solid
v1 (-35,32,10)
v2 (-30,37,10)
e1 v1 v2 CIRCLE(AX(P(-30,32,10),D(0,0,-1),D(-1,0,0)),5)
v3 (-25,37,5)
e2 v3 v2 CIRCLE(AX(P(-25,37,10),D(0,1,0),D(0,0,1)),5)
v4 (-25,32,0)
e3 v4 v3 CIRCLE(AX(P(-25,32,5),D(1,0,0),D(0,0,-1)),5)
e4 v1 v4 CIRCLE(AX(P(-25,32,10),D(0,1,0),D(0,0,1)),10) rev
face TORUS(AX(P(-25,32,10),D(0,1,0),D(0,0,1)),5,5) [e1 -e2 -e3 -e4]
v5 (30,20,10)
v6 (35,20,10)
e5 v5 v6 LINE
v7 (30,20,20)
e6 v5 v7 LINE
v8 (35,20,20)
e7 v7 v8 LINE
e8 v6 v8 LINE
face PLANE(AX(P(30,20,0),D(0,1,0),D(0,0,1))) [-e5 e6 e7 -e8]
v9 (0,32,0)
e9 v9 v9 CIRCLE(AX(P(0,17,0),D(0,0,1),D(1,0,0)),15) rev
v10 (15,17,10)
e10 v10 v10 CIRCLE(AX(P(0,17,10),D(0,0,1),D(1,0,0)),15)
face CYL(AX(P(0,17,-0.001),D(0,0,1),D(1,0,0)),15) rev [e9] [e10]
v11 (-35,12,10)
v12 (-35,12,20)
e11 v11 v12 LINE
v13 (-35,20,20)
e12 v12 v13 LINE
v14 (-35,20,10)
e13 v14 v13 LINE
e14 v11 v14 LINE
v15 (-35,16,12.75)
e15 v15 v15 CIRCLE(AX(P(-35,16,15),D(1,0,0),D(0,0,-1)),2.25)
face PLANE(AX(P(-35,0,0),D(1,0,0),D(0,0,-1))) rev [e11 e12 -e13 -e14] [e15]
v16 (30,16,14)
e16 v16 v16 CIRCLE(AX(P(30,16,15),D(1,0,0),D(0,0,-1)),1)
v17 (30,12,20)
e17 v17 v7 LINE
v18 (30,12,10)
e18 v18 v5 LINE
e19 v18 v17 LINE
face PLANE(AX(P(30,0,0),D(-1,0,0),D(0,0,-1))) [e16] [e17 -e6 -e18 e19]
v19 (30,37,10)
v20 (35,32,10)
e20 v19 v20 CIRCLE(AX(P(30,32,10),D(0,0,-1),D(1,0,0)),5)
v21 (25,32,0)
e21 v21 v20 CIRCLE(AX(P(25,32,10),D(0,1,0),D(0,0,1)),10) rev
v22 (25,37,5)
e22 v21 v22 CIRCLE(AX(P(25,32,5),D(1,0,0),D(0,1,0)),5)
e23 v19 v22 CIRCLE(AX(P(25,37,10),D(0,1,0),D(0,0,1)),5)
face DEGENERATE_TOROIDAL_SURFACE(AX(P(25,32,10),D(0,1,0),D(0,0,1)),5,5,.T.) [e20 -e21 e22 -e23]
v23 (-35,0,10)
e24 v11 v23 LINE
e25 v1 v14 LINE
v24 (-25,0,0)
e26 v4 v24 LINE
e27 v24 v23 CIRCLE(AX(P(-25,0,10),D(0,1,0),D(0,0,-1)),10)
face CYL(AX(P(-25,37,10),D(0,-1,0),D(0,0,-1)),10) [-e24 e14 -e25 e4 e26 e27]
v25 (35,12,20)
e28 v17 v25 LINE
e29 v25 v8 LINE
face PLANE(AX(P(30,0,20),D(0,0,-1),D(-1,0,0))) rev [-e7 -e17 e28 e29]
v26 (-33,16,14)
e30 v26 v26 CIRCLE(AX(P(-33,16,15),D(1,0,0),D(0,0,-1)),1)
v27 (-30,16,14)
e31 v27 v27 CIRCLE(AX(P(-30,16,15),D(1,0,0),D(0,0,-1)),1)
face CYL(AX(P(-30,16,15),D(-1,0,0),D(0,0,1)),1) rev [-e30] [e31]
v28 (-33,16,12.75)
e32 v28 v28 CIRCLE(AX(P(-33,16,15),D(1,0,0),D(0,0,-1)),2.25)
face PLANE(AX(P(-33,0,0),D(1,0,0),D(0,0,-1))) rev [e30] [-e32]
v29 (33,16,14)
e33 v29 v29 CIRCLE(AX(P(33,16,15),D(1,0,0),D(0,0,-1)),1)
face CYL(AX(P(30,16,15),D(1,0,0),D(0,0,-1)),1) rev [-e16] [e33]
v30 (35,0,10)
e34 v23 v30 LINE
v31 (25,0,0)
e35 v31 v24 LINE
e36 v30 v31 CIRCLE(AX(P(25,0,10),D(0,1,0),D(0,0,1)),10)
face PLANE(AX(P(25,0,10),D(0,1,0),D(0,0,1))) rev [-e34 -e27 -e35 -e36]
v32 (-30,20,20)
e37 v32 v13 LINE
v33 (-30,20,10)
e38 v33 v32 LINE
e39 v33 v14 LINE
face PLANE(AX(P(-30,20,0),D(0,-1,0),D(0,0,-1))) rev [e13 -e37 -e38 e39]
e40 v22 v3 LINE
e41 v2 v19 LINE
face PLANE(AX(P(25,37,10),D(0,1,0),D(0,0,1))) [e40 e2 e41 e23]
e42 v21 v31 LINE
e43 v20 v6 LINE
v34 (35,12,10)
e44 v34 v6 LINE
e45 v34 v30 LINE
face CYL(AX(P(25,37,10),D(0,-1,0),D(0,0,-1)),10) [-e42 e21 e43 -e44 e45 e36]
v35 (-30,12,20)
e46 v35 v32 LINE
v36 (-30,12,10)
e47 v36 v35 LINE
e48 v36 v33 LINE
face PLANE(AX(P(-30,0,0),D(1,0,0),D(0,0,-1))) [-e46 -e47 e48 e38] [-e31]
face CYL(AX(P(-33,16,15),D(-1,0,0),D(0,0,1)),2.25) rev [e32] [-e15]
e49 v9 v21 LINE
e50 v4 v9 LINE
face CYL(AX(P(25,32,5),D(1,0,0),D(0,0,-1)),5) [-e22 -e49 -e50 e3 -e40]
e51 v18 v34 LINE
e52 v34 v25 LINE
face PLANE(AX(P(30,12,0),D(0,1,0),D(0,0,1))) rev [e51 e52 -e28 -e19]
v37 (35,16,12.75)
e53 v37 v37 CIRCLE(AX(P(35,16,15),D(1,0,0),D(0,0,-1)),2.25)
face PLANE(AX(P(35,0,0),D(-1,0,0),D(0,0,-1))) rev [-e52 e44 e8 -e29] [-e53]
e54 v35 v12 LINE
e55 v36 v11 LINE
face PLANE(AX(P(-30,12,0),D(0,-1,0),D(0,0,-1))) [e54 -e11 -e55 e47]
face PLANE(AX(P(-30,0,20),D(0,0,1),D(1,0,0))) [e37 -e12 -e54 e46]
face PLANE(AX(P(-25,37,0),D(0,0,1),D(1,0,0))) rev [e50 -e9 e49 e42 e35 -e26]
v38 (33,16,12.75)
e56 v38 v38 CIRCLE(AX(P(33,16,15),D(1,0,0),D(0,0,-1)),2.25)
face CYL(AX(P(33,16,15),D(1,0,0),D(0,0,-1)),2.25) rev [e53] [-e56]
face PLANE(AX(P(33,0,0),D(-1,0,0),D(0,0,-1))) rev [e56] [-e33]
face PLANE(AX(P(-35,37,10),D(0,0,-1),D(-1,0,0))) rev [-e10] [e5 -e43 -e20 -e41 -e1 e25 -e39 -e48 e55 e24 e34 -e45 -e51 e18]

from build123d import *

# Parameters (mm, degrees)
BOSS_EXTRUDE1_DEPTH = 37
CUT_EXTRUDE1_REACH  = 53.904
FILLET1_R           = 5
CUT_EXTRUDE2_REACH  = 53.904
SKETCH4_R           = 15
SKETCH5_W           = 10
SKETCH5_H           = 8
SKETCH5_R           = 2.25
SKETCH5_R_2         = 1
BOSS_EXTRUDE2_DEPTH = 5
SKETCH5_3_R         = 2.25
SKETCH5_3_R_2       = 1
CUT_EXTRUDE3_DEPTH  = 2


with BuildPart() as part:
    # Sketch1 → Boss-Extrude1 (new body)
    with BuildSketch(Plane(origin=(0, 0, 0), x_dir=(1, 0, 0), z_dir=(0, 1, 0))):
        with BuildLine():
            Line((-25, 0), (25, 0))
            ThreePointArc((25, 0), (32.071067812, -2.928932188), (35, -10))
            Line((35, -10), (-35, -10))
            ThreePointArc((-35, -10), (-32.071067812, -2.928932188), (-25, 0))
        make_face()
    extrude(amount=BOSS_EXTRUDE1_DEPTH)

    # Sketch3 → Cut-Extrude1 (cut, up to next)
    with BuildSketch(Plane.XY.offset(10), mode=Mode.PRIVATE) as cut_extrude1_sk1:
        with BuildLine():
            Line((-30, 37), (-35, 37))
            Line((-35, 37), (-35, 32))
            ThreePointArc((-35, 32), (-33.535533906, 35.535533906), (-30, 37))
        make_face()
    cut_extrude1_tool1 = extrude(cut_extrude1_sk1.sketch, amount=-CUT_EXTRUDE1_REACH, mode=Mode.PRIVATE) & part.part
    # Sketch3 → Cut-Extrude1 (cut, up to next)
    with BuildSketch(Plane.XY.offset(10), mode=Mode.PRIVATE) as cut_extrude1_sk2:
        with BuildLine():
            Line((30, 37), (35, 37))
            Line((35, 37), (35, 32))
            ThreePointArc((35, 32), (33.535533906, 35.535533906), (30, 37))
        make_face()
    cut_extrude1_tool2 = extrude(cut_extrude1_sk2.sketch, amount=-CUT_EXTRUDE1_REACH, mode=Mode.PRIVATE) & part.part
    add(cut_extrude1_tool1.solids().sort_by_distance((-33.88316, 35.88316, 10))[0], mode=Mode.SUBTRACT)
    add(cut_extrude1_tool2.solids().sort_by_distance((33.88316, 35.88316, 10))[0], mode=Mode.SUBTRACT)

    # Fillet1
    # the kernel refuses this fillet: 5 mm, written as the material it takes off along each edge
    with BuildSketch(Plane(origin=(25, 37, 10), x_dir=(0, 0, -1), z_dir=(-1, 0, 0))) as fillet1_piece_1:
        with BuildLine():
            CenterArc((10 - FILLET1_R, FILLET1_R), FILLET1_R, 270, 90)
            Line((10 - FILLET1_R, 0), (10, 0))
            Line((10, 0), (10, FILLET1_R))
        make_face()
    revolve(axis=Axis((25, 37, 10), (0, -1, 0)), revolution_arc=101.622920284, mode=Mode.SUBTRACT)
    with BuildSketch(Plane(origin=(-25, 37, 10), x_dir=(-0.9794947331304567, 0, 0.20146976887288942), z_dir=(0.20146976887288942, 0, 0.9794947331304567))) as fillet1_piece_2:
        with BuildLine():
            CenterArc((10 - FILLET1_R, FILLET1_R), FILLET1_R, 270, 90)
            Line((10, FILLET1_R), (10, 0))
            Line((10, 0), (10 - FILLET1_R, 0))
        make_face()
    revolve(axis=Axis((-25, 37, 10), (0, -1, 0)), revolution_arc=101.622920284, mode=Mode.SUBTRACT)
    with BuildSketch(Plane(origin=(-25, 37, 0), x_dir=(0, 0, 1), z_dir=(1, 0, 0))) as fillet1_piece_3:
        with BuildLine():
            CenterArc((FILLET1_R, FILLET1_R), FILLET1_R, 180, 90)
            Line((0, FILLET1_R), (0, 0))
            Line((0, 0), (FILLET1_R, 0))
        make_face()
    extrude(amount=50, mode=Mode.SUBTRACT)

    # Sketch4 → Cut-Extrude2 (cut, up to next)
    with BuildSketch(Plane.XY.offset(10), mode=Mode.PRIVATE) as cut_extrude2_sk1:
        with Locations((0, 17)):
            Circle(SKETCH4_R)
    cut_extrude2_tool1 = extrude(cut_extrude2_sk1.sketch, amount=-CUT_EXTRUDE2_REACH, mode=Mode.PRIVATE) & part.part
    add(cut_extrude2_tool1.solids().sort_by_distance((0, 17, 10))[0], mode=Mode.SUBTRACT)

    # Sketch5 → Boss-Extrude2 (add)
    # profile 1 of 2: a face of its own
    with BuildSketch(Plane(origin=(-35, 0, 0), x_dir=(0, 0, -1), z_dir=(1, 0, 0))):
        with Locations((-15, 16)):
            Rectangle(SKETCH5_W, SKETCH5_H)
        with Locations((-15, 16)):
            Circle(SKETCH5_R, mode=Mode.SUBTRACT)
    # profile 2 of 2: a face of its own
    with BuildSketch(Plane(origin=(-35, 0, 0), x_dir=(0, 0, -1), z_dir=(1, 0, 0))):
        with Locations((-15, 16)):
            Circle(SKETCH5_R)
        with Locations((-15, 16)):
            Circle(SKETCH5_R_2, mode=Mode.SUBTRACT)
    boss_extrude2 = extrude(amount=BOSS_EXTRUDE2_DEPTH)

    # Sketch5<3> → Cut-Extrude3 (cut)
    with BuildSketch(Plane(origin=(-35, 0, 0), x_dir=(0, 0, -1), z_dir=(1, 0, 0))):
        with Locations((-15, 16)):
            Circle(SKETCH5_3_R)
        with Locations((-15, 16)):
            Circle(SKETCH5_3_R_2, mode=Mode.SUBTRACT)
    cut_extrude3 = extrude(amount=CUT_EXTRUDE3_DEPTH, mode=Mode.SUBTRACT)

    # Mirror1: Boss-Extrude2, Cut-Extrude3 across plane
    add(boss_extrude2.mirror(Plane(origin=(0, 0, 0), x_dir=(0, 0, 1), z_dir=(1, 0, 0))))
    add(cut_extrude3.mirror(Plane(origin=(0, 0, 0), x_dir=(0, 0, 1), z_dir=(1, 0, 0))), mode=Mode.SUBTRACT)


solid = part.part
